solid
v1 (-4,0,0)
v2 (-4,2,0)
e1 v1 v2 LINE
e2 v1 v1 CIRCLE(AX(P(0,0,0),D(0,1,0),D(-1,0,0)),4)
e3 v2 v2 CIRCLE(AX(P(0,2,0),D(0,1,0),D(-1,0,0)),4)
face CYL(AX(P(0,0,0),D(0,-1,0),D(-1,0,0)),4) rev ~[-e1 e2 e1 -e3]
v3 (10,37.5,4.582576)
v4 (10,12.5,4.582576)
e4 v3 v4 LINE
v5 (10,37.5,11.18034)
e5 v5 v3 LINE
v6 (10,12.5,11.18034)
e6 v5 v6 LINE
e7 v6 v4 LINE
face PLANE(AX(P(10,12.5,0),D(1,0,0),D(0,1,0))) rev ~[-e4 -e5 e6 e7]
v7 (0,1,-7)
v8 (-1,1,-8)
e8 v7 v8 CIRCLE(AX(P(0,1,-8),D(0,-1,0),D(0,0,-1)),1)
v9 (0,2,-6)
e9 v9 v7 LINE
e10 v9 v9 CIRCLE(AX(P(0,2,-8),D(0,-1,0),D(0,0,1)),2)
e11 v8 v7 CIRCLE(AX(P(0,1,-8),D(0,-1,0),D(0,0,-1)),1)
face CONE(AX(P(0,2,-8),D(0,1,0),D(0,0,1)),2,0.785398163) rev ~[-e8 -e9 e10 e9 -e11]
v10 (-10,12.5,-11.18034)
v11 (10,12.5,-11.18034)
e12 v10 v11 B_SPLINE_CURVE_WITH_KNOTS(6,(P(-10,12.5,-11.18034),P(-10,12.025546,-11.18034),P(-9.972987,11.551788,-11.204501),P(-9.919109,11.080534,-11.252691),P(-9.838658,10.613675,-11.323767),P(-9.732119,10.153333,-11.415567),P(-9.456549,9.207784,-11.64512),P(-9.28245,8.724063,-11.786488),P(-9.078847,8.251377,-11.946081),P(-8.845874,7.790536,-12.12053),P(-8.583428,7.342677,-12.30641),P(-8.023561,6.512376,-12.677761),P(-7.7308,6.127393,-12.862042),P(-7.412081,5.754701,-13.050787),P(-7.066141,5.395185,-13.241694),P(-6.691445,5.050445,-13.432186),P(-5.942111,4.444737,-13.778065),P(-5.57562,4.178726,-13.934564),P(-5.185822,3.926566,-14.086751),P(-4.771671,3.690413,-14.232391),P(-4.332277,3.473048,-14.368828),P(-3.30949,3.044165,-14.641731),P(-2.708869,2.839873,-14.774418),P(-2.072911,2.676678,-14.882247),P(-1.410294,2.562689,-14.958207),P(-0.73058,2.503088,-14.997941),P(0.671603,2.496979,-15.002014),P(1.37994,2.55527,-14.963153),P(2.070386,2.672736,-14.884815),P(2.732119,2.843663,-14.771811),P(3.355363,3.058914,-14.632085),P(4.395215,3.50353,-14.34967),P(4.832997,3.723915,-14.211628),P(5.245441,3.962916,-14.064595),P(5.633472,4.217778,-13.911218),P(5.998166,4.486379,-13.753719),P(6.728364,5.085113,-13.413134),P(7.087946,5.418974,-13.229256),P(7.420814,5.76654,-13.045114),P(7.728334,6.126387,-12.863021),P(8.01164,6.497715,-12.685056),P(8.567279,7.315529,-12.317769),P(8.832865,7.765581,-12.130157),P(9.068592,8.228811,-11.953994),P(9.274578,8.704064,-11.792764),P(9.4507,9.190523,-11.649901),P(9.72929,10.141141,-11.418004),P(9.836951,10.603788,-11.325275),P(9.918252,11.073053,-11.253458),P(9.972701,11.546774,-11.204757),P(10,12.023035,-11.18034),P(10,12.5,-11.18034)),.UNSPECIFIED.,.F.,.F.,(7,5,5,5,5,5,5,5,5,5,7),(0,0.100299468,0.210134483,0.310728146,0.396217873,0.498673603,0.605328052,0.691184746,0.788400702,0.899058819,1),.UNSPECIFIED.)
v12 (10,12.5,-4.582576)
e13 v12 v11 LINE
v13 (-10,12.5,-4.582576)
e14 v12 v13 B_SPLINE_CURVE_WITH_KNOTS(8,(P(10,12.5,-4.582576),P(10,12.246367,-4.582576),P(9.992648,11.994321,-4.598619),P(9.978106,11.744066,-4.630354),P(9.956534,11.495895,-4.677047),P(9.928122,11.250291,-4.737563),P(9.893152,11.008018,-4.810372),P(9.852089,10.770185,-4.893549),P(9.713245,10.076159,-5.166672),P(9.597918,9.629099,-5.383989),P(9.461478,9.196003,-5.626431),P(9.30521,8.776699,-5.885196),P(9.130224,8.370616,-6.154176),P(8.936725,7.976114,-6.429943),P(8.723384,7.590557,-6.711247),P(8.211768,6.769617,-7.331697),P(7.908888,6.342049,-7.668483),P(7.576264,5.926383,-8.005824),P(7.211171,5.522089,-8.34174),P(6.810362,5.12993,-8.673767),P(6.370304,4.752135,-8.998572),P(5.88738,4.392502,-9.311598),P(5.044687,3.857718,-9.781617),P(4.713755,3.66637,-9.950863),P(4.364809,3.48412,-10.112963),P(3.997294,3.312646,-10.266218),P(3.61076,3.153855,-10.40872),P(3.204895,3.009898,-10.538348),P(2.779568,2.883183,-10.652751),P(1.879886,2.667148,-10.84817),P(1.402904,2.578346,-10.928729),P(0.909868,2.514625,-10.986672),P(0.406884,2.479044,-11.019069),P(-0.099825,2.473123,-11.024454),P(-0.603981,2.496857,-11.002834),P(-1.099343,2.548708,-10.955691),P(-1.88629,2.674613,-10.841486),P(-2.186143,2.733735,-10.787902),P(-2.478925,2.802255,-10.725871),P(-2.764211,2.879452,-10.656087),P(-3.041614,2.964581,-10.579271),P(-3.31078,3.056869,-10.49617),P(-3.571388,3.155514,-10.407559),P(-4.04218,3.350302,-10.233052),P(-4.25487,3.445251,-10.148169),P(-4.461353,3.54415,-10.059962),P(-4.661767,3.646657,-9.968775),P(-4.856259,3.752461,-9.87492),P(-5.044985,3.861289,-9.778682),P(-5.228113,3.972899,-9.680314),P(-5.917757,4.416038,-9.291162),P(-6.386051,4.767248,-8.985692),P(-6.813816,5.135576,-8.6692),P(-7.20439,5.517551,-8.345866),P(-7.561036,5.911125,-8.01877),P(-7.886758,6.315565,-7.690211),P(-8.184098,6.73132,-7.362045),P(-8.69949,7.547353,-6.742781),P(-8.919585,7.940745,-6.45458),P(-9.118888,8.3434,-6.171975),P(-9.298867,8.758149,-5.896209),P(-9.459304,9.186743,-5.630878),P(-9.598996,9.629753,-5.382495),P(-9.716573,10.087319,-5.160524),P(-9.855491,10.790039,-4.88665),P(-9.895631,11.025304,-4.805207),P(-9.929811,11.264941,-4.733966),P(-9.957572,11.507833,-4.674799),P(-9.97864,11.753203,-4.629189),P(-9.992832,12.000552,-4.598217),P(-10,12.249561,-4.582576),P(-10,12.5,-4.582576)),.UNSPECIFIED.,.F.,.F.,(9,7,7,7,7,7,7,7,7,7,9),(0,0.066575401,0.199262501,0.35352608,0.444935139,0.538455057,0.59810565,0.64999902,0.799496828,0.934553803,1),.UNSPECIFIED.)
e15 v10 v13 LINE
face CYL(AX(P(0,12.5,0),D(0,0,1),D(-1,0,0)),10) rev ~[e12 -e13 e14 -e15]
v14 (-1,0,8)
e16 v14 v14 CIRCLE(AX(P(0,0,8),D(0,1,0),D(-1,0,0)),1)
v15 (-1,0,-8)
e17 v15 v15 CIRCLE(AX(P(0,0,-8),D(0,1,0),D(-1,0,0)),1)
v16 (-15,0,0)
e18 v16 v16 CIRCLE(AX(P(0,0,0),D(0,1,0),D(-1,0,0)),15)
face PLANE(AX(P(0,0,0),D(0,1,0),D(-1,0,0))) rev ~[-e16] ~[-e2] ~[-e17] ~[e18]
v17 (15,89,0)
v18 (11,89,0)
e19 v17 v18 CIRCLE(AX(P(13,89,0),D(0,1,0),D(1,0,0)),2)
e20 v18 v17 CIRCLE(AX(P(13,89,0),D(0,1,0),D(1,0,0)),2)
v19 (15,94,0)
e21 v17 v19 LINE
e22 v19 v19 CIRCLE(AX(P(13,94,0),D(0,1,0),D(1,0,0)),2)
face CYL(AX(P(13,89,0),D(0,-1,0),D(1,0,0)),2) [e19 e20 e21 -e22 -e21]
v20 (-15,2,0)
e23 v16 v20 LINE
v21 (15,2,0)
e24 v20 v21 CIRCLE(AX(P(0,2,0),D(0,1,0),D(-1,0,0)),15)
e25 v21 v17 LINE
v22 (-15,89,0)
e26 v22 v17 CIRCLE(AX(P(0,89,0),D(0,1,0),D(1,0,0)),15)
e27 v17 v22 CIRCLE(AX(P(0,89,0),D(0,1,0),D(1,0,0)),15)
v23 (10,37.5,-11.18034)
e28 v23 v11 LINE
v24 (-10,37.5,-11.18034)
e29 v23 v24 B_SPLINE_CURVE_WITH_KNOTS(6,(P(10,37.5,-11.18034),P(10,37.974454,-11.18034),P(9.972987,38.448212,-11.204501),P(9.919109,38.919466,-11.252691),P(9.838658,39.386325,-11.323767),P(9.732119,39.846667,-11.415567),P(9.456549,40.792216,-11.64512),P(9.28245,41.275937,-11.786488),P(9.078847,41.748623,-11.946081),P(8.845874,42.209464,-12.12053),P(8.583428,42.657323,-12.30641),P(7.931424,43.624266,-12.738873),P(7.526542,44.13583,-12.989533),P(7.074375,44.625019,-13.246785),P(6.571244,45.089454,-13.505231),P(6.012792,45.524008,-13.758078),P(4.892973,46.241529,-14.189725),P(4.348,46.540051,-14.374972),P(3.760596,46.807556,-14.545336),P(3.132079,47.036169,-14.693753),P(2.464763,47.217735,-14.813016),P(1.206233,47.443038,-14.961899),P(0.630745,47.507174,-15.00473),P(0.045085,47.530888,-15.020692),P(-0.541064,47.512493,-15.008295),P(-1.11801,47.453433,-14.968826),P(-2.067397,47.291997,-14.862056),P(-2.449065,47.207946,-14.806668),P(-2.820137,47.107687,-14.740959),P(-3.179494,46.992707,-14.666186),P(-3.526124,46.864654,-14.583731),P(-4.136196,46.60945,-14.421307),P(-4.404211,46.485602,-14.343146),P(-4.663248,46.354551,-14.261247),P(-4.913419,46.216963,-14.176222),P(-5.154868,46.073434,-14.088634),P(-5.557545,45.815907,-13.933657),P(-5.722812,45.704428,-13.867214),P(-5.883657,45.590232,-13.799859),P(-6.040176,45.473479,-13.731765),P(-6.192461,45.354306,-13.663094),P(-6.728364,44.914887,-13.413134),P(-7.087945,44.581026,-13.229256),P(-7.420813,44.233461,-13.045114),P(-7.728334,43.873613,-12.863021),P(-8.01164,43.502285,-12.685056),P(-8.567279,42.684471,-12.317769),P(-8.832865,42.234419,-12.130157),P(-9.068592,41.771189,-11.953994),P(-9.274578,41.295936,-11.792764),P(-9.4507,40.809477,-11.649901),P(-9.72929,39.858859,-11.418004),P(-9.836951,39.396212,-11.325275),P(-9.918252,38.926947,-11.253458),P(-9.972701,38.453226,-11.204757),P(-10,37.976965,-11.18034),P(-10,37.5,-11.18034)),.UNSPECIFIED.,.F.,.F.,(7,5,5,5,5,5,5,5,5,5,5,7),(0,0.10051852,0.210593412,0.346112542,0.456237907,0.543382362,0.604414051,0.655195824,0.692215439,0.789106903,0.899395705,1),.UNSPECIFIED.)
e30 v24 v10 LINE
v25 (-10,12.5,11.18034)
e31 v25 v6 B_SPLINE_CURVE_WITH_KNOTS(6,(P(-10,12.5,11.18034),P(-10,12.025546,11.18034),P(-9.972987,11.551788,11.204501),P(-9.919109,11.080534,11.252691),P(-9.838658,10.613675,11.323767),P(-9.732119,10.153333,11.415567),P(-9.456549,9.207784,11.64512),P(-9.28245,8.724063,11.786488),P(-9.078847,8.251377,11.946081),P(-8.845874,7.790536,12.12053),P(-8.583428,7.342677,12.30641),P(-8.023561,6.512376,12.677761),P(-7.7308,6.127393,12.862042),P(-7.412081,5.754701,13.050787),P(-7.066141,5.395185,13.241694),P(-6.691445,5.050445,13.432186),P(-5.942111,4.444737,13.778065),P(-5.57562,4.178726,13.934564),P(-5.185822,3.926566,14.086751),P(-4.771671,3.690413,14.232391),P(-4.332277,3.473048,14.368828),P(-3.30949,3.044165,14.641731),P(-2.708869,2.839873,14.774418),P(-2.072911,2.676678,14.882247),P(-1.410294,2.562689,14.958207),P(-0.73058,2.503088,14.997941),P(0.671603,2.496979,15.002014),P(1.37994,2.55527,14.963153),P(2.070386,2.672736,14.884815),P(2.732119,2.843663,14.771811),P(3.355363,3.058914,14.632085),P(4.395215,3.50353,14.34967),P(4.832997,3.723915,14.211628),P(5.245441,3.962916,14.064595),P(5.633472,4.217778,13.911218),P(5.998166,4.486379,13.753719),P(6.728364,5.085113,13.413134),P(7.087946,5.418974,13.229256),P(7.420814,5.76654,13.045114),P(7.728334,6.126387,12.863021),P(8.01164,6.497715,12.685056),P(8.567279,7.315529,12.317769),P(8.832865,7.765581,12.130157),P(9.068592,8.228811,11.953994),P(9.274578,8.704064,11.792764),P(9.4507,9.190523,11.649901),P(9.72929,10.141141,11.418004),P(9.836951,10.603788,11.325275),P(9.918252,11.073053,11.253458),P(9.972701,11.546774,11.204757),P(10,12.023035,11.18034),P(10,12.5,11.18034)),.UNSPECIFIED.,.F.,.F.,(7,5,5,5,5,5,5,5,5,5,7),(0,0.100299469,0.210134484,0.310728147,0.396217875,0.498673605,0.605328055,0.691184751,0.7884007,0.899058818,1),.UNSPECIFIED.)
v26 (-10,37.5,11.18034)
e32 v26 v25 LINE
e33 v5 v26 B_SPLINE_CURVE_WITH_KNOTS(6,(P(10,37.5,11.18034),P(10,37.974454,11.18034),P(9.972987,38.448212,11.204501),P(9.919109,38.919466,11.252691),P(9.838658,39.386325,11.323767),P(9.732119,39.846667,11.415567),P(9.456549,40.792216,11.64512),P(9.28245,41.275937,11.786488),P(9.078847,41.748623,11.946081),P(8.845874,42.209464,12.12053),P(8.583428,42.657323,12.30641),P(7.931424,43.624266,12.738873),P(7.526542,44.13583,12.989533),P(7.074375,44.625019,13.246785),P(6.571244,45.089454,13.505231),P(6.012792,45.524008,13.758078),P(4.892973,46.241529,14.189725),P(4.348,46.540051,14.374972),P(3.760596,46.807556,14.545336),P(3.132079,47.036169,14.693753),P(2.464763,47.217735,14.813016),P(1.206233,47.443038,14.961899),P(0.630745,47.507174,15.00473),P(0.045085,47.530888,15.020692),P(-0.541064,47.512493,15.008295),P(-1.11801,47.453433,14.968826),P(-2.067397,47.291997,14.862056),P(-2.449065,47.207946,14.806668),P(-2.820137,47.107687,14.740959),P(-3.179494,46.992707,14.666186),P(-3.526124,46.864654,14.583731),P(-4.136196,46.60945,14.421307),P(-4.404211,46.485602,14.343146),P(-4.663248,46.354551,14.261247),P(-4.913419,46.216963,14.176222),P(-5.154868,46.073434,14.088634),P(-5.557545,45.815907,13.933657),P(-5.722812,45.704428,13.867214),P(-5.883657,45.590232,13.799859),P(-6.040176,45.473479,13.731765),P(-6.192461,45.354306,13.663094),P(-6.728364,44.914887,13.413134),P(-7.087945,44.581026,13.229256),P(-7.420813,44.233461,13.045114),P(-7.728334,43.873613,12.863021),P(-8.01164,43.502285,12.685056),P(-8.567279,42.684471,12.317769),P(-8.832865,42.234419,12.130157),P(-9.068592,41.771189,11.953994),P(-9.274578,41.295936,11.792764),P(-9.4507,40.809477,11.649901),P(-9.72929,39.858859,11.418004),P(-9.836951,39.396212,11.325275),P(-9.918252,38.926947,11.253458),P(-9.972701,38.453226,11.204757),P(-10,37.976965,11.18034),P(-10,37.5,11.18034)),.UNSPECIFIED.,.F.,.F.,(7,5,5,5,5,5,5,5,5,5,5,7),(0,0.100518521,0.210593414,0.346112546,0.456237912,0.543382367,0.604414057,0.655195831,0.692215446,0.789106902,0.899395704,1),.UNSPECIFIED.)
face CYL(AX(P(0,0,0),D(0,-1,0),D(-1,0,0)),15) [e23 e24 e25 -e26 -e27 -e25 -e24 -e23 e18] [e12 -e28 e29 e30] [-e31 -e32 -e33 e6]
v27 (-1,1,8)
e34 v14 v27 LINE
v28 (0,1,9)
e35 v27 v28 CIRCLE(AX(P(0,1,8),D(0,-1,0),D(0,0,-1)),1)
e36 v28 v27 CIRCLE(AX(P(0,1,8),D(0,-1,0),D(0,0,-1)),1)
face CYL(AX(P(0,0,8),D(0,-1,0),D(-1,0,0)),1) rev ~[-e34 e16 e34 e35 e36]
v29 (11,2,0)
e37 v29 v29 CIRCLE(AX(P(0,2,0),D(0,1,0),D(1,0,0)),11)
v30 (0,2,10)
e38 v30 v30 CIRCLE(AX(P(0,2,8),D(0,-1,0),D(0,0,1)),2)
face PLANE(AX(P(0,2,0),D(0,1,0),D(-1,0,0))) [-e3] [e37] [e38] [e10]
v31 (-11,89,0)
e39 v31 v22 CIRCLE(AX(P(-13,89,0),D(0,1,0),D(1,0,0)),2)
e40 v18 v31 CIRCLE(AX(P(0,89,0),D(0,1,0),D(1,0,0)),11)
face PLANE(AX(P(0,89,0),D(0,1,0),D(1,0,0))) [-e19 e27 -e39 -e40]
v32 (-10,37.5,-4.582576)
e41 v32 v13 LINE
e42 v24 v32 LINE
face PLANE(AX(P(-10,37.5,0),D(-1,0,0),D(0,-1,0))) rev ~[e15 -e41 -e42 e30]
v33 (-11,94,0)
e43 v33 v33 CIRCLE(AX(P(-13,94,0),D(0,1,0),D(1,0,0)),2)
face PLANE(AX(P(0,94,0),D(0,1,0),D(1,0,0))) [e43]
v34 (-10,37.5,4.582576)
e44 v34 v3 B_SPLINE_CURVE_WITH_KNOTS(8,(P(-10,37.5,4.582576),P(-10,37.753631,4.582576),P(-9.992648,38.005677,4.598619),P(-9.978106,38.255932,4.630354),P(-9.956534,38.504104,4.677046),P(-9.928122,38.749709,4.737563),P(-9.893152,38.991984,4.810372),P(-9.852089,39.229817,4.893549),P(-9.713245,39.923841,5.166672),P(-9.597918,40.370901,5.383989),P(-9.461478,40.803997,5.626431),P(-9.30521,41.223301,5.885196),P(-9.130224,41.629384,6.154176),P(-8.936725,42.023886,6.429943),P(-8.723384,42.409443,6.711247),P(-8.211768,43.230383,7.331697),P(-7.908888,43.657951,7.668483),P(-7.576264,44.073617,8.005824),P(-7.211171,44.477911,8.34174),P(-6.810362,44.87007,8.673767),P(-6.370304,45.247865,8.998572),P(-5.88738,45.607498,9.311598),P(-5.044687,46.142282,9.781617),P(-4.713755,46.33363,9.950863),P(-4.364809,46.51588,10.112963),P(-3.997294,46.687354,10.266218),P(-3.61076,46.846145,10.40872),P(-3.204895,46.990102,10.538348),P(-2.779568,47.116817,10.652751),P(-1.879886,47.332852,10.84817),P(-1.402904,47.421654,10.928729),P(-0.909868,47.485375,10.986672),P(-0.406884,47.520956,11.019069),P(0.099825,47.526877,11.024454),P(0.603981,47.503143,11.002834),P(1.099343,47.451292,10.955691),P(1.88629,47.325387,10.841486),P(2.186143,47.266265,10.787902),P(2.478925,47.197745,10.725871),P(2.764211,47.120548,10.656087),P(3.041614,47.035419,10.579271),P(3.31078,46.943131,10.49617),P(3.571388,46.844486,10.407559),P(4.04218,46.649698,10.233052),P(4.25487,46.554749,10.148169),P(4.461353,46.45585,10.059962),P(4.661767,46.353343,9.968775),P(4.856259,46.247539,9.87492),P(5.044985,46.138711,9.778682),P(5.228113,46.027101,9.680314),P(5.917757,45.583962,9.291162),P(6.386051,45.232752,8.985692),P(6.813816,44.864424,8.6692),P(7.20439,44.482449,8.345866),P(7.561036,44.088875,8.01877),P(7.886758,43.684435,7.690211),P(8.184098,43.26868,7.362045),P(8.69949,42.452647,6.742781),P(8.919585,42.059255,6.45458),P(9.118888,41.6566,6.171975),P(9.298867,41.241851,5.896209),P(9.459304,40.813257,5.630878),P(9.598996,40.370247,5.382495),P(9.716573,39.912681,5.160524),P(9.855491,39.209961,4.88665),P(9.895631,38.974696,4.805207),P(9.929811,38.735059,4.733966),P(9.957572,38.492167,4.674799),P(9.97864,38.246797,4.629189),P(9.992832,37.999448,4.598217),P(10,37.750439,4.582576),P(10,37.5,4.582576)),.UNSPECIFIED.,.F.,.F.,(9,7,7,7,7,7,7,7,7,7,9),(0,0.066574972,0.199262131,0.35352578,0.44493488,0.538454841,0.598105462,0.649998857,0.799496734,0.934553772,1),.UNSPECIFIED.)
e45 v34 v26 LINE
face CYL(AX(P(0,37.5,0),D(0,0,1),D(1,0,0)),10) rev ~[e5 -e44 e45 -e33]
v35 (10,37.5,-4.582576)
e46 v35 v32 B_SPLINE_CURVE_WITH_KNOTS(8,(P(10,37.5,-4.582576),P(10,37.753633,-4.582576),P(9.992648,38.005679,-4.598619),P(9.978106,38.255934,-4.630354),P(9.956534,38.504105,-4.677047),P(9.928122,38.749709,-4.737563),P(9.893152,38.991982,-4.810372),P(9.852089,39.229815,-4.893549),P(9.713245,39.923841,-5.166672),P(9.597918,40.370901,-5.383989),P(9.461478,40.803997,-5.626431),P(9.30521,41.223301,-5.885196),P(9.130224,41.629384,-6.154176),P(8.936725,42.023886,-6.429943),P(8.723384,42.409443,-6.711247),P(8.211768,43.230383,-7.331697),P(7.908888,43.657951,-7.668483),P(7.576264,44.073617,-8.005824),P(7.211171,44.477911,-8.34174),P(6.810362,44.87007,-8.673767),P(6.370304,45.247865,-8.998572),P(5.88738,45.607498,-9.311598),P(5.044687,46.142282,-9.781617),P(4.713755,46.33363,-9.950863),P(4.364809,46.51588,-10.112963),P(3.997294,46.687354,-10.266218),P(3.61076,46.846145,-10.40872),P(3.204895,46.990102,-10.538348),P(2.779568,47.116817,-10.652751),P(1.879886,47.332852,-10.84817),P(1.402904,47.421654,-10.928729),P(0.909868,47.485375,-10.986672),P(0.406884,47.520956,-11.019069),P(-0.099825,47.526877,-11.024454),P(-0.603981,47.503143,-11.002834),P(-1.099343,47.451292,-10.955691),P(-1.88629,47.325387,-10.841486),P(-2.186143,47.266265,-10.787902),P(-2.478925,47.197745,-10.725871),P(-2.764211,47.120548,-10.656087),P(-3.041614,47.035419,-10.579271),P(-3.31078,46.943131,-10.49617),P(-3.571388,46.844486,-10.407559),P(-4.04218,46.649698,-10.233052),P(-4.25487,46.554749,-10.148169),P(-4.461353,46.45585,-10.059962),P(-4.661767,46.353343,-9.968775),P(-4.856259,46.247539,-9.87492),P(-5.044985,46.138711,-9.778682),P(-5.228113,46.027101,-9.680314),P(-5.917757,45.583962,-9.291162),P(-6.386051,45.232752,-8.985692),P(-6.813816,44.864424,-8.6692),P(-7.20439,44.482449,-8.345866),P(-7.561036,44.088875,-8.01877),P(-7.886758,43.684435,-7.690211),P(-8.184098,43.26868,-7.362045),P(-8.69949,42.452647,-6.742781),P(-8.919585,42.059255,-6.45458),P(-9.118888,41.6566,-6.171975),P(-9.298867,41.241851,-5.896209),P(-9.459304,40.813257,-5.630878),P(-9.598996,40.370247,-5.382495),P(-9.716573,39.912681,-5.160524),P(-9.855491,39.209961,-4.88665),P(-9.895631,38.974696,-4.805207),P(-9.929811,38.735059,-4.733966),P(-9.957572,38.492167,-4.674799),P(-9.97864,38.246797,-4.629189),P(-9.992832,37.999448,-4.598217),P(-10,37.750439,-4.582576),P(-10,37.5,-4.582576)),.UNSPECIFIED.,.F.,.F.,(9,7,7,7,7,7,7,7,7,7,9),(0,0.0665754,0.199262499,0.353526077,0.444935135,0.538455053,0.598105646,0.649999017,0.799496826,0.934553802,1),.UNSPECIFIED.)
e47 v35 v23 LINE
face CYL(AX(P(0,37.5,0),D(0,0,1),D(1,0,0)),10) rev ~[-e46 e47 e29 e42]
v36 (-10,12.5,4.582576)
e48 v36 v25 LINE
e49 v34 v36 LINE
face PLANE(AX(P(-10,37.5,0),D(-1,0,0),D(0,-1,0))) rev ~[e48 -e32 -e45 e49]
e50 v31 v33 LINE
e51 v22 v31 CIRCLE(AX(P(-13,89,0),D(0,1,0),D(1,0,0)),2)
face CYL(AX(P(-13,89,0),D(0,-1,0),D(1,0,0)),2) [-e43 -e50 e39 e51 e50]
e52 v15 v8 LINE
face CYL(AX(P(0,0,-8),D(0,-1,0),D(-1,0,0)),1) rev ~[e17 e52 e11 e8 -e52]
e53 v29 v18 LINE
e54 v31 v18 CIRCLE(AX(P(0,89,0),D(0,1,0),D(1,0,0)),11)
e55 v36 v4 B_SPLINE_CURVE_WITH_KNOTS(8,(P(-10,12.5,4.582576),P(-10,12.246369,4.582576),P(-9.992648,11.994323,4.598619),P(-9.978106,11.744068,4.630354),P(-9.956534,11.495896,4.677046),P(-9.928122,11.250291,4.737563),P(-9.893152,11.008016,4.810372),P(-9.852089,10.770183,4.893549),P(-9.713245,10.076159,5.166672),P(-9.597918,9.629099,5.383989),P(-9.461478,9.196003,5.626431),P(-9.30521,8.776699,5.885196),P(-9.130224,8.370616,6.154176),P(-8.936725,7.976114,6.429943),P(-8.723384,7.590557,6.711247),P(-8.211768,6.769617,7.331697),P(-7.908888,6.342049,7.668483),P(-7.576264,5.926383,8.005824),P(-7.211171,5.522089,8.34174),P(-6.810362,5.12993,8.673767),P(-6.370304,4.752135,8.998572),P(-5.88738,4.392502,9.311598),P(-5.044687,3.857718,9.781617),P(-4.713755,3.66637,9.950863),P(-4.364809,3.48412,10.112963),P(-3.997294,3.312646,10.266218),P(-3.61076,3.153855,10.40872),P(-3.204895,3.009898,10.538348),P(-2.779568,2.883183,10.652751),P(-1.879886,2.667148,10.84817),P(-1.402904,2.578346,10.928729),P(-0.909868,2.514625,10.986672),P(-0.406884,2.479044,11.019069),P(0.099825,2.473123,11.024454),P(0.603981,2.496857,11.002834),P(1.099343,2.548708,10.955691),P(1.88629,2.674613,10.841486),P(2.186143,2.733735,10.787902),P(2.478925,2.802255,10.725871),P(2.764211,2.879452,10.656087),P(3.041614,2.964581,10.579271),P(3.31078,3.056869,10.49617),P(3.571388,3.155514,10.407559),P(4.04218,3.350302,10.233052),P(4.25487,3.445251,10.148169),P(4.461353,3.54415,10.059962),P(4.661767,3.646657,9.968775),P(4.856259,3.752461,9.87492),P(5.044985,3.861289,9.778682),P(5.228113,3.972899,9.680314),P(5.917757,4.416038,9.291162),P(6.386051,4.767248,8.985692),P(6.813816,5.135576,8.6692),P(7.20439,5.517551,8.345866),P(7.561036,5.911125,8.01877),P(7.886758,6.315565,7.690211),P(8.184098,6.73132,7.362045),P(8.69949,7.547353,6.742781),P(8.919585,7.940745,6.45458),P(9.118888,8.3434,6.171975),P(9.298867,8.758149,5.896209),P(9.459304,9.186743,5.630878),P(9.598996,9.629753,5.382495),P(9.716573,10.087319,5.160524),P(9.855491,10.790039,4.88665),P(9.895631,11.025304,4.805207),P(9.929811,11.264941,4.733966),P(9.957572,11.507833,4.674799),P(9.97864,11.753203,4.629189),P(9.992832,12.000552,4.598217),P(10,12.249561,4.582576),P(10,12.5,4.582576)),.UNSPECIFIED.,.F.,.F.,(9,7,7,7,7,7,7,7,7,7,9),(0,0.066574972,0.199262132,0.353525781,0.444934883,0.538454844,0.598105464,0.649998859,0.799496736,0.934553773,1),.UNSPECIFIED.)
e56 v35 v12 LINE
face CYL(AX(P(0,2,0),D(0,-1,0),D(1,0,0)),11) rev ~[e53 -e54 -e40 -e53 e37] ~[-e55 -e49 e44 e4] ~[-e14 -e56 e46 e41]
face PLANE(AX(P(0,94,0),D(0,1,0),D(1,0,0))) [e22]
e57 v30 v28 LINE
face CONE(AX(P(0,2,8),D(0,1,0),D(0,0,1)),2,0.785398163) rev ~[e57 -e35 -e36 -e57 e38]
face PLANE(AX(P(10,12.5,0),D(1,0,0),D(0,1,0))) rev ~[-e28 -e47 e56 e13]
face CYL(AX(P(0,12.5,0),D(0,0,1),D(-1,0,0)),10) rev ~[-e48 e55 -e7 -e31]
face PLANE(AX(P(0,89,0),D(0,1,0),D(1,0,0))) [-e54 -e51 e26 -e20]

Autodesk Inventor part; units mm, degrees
ref_plane "YZ Plane" through (0, 0, 0) normal (1, 0, 0) x (0, 1, 0)
ref_plane "XZ Plane" through (0, 0, 0) normal (0, 1, 0) x (-1, 0, 0)
ref_plane "XY Plane" through (0, 0, 0) normal (0, 0, 1) x (1, 0, 0)
sketch "Sketch1" plane through (0, 0, 0) normal (0, 1, 0) x (-1, 0, 0)
  circle A0 centre (0, 0) radius 4
  circle A1 centre (0, 0) radius 15
  circle A2 centre (0, -8) radius 1
  circle A3 centre (0, 8) radius 1
  dimension "d0" = 30
  dimension "d1" = 8
  dimension "d2" = 8
  dimension "d3" = 2
  dimension "d4" = 2
  dimension "d5" = 8
extrude "Extrusion1" add sketch "Sketch1" along normal blind 2
sketch "Sketch2" plane through (0, 2, 0) normal (0, 1, 0) x (1, 0, 0)
  circle A0 centre (0, 0) radius 15
  line L0 (0, 0) -> (18.7194, 0) construction
  circle A1 centre (0, 0) radius 11
  dimension "d33" = 22
extrude "Extrusion2" add sketch "Sketch2" along normal blind 87
sketch "Sketch3" plane through (0, 89, 0) normal (0, 1, 0) x (1, 0, 0)
  circle A0 centre (13, 0) radius 2
  circle A1 centre (-13, 0) radius 2
  point P0 (0, 0)
  dimension "d15" = 4
  dimension "d16" = 4
  dimension "d17" = 13
  dimension "d18" = 13
extrude "Extrusion3" add sketch "Sketch3" along normal blind 5
sketch "Sketch4" plane through (0, 2, 0) normal (0, 1, 0) x (1, 0, 0)
  circle A0 centre (0, -8) radius 1 projected
  circle A1 centre (0, 8) radius 1 projected
  point P0 (0, 0)
hole "Hole1" at (0, 2, 8) at (0, 2, -8) direction (0, -1, 0) diameter 1.567 depth 2 countersink diameter 4 countersink angle 90 thread size "M2x0.4" class "6H" standard "ANSI Metric M Profile"
sketch "Sketch6" plane through (0, 0, 0) normal (0, 0, 1) x (1, 0, 0)
  line L0 (0, 37.5) -> (0, 12.5) construction
  line L1 (-10, 37.5) -> (-10, 12.5)
  line L2 (10, 12.5) -> (10, 37.5)
  arc A0 (10, 37.5) -> (-10, 37.5) centre (0, 37.5) ccw
  arc A1 (-10, 12.5) -> (10, 12.5) centre (0, 12.5) ccw
  line L3 (-4, 2) -> (4, 2) projected
  point P0 (0, 0)
  point P1 (0, 25)
  point P2 (-3.1225, 2)
  point P3 (3.1225, 2)
  dimension "d28" = 20
  dimension "d29" = 25
  dimension "d30" = 23
extrude "Extrusion4" cut sketch "Sketch6" against normal mid plane 40
properties part number "Lock"
